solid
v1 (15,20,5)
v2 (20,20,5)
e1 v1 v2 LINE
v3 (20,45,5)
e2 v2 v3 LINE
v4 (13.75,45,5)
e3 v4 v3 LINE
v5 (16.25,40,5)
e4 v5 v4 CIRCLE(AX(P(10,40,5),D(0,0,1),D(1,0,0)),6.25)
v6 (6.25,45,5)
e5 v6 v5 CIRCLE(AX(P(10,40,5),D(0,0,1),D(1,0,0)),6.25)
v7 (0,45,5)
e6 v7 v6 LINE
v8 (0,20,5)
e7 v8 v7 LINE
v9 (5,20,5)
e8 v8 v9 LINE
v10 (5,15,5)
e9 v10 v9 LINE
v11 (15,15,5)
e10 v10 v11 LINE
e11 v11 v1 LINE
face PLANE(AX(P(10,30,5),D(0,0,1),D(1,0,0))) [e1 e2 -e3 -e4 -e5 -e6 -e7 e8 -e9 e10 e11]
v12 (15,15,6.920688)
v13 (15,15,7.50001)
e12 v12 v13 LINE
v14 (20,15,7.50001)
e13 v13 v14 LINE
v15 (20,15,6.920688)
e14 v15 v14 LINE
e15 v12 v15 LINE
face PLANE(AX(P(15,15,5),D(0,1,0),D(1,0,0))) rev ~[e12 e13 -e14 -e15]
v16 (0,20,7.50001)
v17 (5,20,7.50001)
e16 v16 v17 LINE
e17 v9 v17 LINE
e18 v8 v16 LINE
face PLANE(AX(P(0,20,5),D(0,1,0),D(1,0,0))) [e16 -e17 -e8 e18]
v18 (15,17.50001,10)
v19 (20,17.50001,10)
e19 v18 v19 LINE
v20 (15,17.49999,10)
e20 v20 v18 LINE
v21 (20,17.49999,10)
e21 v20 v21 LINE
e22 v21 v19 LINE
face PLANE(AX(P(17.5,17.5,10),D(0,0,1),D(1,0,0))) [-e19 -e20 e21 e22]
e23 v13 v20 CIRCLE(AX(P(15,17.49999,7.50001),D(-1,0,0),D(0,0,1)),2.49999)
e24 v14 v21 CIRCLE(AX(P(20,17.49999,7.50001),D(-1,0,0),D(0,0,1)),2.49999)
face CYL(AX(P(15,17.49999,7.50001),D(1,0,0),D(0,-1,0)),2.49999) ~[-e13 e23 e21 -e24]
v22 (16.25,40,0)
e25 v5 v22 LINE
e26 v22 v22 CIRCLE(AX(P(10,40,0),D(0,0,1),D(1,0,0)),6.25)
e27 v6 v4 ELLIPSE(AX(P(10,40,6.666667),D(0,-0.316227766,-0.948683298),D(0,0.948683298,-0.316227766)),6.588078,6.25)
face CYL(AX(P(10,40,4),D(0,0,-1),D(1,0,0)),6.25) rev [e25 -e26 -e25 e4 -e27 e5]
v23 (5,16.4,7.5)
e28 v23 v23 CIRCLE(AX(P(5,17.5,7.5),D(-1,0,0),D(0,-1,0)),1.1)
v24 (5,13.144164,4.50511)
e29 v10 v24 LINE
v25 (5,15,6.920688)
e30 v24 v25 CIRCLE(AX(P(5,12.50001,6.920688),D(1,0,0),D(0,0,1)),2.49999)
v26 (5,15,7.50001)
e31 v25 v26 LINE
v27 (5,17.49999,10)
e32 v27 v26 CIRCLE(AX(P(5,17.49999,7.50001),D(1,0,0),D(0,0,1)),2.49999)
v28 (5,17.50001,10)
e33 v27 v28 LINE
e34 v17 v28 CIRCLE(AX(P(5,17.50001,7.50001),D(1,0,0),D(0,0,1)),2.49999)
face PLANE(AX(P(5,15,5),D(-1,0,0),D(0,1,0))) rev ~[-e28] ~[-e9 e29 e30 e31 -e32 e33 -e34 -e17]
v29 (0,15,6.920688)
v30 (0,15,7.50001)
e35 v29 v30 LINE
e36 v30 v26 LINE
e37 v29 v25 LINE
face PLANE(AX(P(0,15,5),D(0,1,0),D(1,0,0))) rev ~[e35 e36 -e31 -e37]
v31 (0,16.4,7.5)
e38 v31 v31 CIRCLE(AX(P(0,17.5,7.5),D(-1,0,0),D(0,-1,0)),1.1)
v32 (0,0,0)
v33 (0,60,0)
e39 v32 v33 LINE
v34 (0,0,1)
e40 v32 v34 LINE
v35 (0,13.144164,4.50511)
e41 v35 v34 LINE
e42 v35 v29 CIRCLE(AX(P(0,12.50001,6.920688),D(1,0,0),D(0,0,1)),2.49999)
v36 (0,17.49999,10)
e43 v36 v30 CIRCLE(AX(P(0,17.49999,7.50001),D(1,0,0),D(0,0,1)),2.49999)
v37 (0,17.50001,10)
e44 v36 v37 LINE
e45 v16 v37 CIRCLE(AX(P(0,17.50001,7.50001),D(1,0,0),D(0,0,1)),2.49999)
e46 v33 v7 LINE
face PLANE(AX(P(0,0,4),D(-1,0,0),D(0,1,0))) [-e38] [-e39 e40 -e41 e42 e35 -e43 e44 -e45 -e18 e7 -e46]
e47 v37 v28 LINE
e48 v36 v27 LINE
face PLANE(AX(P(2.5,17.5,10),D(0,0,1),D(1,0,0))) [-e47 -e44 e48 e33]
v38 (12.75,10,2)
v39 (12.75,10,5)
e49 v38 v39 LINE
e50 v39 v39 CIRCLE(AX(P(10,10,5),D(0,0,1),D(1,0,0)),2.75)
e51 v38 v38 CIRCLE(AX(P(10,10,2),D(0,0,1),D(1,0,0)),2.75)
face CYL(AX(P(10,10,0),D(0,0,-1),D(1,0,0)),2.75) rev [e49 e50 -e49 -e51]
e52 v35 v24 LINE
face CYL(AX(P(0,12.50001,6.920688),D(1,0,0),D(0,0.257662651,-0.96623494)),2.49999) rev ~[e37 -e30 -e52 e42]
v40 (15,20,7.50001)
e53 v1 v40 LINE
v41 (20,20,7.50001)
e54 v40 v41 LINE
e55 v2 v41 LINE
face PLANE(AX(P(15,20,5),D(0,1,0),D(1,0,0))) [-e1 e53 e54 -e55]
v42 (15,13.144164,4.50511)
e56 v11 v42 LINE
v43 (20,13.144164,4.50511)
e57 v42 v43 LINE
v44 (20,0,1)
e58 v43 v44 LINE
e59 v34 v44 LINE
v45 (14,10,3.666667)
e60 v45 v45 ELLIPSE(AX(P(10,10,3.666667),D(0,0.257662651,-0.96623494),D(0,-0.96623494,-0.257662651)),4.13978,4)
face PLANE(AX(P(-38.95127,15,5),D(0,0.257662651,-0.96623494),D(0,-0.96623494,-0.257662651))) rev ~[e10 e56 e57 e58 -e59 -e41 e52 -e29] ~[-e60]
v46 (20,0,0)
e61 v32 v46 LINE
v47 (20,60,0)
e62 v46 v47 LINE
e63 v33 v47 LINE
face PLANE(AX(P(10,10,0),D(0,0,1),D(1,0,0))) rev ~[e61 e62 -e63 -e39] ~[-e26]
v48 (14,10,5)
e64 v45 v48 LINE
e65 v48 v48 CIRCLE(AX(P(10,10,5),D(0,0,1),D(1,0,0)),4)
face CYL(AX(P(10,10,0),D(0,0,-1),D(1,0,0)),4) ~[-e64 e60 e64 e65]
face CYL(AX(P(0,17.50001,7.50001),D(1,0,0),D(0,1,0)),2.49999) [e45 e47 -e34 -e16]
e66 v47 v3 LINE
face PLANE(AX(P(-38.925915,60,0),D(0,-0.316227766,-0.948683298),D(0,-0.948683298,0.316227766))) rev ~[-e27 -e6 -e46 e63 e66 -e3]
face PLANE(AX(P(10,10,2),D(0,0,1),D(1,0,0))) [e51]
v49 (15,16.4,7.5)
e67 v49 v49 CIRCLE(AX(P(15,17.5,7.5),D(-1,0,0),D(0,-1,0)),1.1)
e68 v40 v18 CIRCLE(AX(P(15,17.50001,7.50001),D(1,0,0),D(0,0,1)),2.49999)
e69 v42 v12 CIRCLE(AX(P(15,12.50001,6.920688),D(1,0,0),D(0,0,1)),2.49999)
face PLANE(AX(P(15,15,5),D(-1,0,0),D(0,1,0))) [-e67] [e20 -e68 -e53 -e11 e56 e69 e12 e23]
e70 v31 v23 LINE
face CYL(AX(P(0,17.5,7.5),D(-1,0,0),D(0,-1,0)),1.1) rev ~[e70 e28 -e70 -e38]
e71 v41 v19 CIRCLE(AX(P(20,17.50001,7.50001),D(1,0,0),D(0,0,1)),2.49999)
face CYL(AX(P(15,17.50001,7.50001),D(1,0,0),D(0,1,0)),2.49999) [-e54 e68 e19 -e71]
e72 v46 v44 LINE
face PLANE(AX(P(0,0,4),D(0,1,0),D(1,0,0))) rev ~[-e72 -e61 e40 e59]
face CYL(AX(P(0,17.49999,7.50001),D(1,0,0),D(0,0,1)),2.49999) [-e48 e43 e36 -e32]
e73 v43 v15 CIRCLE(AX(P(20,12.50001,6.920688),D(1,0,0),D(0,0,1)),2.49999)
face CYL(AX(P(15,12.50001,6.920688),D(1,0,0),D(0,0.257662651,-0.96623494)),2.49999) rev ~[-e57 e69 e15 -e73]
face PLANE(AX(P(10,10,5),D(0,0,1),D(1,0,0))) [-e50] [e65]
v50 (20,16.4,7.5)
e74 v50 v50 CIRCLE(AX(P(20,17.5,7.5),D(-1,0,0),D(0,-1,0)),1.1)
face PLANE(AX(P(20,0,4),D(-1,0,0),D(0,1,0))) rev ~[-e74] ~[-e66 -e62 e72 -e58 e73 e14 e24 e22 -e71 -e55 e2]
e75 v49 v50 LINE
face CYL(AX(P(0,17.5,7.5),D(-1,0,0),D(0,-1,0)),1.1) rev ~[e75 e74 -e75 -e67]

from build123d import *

# Parameters (mm, degrees)
F0_W         = 20
F0_H         = 60
F0_R         = 4
F0_R_2       = 6.25
F1_DEPTH     = 4
F1_FACE_W    = 20
F1_FACE_H    = 60
F1_FACE_R    = 4
F1_FACE_R_2  = 6.25
F0_R_3       = 2.75
F2_DEPTH     = 1
F3_W         = 5
F3_H         = 5
F4_DEPTH     = 5
F5_T1_DEPTH  = 97.9025398997
F6_R         = 2.49999
F7_R         = 1.1
F8_DEPTH     = 25
F9_DEPTH     = 5
F10_T1_DEPTH = 97.8518303197
F11_DEPTH    = 2


# Not quite as in the source:
# - a fillet or chamfer that OpenCascade refuses, or shapes differently, is made with other operations: its cross-section is extruded or revolved along the edge and cut away or added
# - a fillet or chamfer is up to 0.001 mm smaller than in the source, because OpenCascade refuses the exact size


with BuildPart() as f1:
    # F0 (on Top) → F1 (new body)
    with BuildSketch(Plane.XY):
        with Locations((10, 30)):
            Rectangle(F0_W, F0_H)
        with Locations((10, 10)):
            Circle(F0_R, mode=Mode.SUBTRACT)
        with Locations((10, 40)):
            Circle(F0_R_2, mode=Mode.SUBTRACT)
    extrude(amount=F1_DEPTH)

    # F1_face (on face) + F0 (on Top) → F2 (join)
    with BuildSketch(Plane(origin=(10, 29.783961526, 4), x_dir=(1, 0, 0), z_dir=(0, 0, 1))):
        with Locations((0, 0.216038474)):
            Rectangle(F1_FACE_W, F1_FACE_H)
        with Locations((0, -19.783961526)):
            Circle(F1_FACE_R, mode=Mode.SUBTRACT)
        with Locations((0, 10.216038474)):
            Circle(F1_FACE_R_2, mode=Mode.SUBTRACT)
    with BuildSketch(Plane.XY):
        with Locations((10, 10)):
            Circle(F0_R)
        with Locations((10, 10)):
            Circle(F0_R_3, mode=Mode.SUBTRACT)
    extrude(amount=F2_DEPTH)

    # F3 (on face) → F4 (join)
    with BuildSketch(Plane.XY.offset(5)):
        with Locations((2.5, 17.5)):
            Rectangle(F3_W, F3_H)
        with Locations((17.5, 17.5)):
            Rectangle(F3_W, F3_H)
    extrude(amount=F4_DEPTH)

    # F5: chamfer of 15 x 4 on 1 edges, made by hand

    # F5_s2 → F5_t1 (cut)
    with BuildSketch(Plane.YZ.offset(-38.9512699498)):
        Polygon((15, 5), (0, 1), (0, 5), align=None)
    extrude(amount=F5_T1_DEPTH, mode=Mode.SUBTRACT)

    # F6 (radius 2.5 in the source; OpenCascade refuses exactly that, so slightly less here)
    f6_edges = [f1.edges().sort_by_distance(p)[0] for p in [
        (2.5, 15, 5),
        (2.5, 15, 10),
        (17.5, 15, 5),
        (17.5, 15, 10),
        (2.5, 20, 10),
        (17.5, 20, 10),
    ]]
    fillet(f6_edges, radius=F6_R)

    # F7 (on face) → F8 (cut)
    with BuildSketch(Plane(origin=(0, 0, 0), x_dir=(0, -1, 0), z_dir=(-1, 0, 0))):
        with Locations((-17.5, 7.5)):
            Circle(F7_R)
    extrude(amount=-F8_DEPTH, mode=Mode.SUBTRACT)

    # F10: chamfer of 5 x 15 on 1 edges, made by hand

    # F10_s2 → F10_t1 (cut)
    with BuildSketch(Plane.YZ.offset(-38.9259151598)):
        Polygon((60, 0), (45, 5), (60, 5), align=None)
    extrude(amount=F10_T1_DEPTH, mode=Mode.SUBTRACT)



with BuildPart() as f9:
    # F0 (on Top) → F9 (new body)
    with BuildSketch(Plane.XY):
        with Locations((10, 10)):
            Circle(F0_R)
        with Locations((10, 10)):
            Circle(F0_R_3, mode=Mode.SUBTRACT)
    extrude(amount=F9_DEPTH)


with BuildPart() as f1_1:
    add(f1.part)

    add(f9.part)  # F11 merges F9
    # F0 (on Top) → F11 (join)
    with BuildSketch(Plane.XY):
        with Locations((10, 10)):
            Circle(F0_R_3)
    extrude(amount=F11_DEPTH)


solid = f1_1.part
